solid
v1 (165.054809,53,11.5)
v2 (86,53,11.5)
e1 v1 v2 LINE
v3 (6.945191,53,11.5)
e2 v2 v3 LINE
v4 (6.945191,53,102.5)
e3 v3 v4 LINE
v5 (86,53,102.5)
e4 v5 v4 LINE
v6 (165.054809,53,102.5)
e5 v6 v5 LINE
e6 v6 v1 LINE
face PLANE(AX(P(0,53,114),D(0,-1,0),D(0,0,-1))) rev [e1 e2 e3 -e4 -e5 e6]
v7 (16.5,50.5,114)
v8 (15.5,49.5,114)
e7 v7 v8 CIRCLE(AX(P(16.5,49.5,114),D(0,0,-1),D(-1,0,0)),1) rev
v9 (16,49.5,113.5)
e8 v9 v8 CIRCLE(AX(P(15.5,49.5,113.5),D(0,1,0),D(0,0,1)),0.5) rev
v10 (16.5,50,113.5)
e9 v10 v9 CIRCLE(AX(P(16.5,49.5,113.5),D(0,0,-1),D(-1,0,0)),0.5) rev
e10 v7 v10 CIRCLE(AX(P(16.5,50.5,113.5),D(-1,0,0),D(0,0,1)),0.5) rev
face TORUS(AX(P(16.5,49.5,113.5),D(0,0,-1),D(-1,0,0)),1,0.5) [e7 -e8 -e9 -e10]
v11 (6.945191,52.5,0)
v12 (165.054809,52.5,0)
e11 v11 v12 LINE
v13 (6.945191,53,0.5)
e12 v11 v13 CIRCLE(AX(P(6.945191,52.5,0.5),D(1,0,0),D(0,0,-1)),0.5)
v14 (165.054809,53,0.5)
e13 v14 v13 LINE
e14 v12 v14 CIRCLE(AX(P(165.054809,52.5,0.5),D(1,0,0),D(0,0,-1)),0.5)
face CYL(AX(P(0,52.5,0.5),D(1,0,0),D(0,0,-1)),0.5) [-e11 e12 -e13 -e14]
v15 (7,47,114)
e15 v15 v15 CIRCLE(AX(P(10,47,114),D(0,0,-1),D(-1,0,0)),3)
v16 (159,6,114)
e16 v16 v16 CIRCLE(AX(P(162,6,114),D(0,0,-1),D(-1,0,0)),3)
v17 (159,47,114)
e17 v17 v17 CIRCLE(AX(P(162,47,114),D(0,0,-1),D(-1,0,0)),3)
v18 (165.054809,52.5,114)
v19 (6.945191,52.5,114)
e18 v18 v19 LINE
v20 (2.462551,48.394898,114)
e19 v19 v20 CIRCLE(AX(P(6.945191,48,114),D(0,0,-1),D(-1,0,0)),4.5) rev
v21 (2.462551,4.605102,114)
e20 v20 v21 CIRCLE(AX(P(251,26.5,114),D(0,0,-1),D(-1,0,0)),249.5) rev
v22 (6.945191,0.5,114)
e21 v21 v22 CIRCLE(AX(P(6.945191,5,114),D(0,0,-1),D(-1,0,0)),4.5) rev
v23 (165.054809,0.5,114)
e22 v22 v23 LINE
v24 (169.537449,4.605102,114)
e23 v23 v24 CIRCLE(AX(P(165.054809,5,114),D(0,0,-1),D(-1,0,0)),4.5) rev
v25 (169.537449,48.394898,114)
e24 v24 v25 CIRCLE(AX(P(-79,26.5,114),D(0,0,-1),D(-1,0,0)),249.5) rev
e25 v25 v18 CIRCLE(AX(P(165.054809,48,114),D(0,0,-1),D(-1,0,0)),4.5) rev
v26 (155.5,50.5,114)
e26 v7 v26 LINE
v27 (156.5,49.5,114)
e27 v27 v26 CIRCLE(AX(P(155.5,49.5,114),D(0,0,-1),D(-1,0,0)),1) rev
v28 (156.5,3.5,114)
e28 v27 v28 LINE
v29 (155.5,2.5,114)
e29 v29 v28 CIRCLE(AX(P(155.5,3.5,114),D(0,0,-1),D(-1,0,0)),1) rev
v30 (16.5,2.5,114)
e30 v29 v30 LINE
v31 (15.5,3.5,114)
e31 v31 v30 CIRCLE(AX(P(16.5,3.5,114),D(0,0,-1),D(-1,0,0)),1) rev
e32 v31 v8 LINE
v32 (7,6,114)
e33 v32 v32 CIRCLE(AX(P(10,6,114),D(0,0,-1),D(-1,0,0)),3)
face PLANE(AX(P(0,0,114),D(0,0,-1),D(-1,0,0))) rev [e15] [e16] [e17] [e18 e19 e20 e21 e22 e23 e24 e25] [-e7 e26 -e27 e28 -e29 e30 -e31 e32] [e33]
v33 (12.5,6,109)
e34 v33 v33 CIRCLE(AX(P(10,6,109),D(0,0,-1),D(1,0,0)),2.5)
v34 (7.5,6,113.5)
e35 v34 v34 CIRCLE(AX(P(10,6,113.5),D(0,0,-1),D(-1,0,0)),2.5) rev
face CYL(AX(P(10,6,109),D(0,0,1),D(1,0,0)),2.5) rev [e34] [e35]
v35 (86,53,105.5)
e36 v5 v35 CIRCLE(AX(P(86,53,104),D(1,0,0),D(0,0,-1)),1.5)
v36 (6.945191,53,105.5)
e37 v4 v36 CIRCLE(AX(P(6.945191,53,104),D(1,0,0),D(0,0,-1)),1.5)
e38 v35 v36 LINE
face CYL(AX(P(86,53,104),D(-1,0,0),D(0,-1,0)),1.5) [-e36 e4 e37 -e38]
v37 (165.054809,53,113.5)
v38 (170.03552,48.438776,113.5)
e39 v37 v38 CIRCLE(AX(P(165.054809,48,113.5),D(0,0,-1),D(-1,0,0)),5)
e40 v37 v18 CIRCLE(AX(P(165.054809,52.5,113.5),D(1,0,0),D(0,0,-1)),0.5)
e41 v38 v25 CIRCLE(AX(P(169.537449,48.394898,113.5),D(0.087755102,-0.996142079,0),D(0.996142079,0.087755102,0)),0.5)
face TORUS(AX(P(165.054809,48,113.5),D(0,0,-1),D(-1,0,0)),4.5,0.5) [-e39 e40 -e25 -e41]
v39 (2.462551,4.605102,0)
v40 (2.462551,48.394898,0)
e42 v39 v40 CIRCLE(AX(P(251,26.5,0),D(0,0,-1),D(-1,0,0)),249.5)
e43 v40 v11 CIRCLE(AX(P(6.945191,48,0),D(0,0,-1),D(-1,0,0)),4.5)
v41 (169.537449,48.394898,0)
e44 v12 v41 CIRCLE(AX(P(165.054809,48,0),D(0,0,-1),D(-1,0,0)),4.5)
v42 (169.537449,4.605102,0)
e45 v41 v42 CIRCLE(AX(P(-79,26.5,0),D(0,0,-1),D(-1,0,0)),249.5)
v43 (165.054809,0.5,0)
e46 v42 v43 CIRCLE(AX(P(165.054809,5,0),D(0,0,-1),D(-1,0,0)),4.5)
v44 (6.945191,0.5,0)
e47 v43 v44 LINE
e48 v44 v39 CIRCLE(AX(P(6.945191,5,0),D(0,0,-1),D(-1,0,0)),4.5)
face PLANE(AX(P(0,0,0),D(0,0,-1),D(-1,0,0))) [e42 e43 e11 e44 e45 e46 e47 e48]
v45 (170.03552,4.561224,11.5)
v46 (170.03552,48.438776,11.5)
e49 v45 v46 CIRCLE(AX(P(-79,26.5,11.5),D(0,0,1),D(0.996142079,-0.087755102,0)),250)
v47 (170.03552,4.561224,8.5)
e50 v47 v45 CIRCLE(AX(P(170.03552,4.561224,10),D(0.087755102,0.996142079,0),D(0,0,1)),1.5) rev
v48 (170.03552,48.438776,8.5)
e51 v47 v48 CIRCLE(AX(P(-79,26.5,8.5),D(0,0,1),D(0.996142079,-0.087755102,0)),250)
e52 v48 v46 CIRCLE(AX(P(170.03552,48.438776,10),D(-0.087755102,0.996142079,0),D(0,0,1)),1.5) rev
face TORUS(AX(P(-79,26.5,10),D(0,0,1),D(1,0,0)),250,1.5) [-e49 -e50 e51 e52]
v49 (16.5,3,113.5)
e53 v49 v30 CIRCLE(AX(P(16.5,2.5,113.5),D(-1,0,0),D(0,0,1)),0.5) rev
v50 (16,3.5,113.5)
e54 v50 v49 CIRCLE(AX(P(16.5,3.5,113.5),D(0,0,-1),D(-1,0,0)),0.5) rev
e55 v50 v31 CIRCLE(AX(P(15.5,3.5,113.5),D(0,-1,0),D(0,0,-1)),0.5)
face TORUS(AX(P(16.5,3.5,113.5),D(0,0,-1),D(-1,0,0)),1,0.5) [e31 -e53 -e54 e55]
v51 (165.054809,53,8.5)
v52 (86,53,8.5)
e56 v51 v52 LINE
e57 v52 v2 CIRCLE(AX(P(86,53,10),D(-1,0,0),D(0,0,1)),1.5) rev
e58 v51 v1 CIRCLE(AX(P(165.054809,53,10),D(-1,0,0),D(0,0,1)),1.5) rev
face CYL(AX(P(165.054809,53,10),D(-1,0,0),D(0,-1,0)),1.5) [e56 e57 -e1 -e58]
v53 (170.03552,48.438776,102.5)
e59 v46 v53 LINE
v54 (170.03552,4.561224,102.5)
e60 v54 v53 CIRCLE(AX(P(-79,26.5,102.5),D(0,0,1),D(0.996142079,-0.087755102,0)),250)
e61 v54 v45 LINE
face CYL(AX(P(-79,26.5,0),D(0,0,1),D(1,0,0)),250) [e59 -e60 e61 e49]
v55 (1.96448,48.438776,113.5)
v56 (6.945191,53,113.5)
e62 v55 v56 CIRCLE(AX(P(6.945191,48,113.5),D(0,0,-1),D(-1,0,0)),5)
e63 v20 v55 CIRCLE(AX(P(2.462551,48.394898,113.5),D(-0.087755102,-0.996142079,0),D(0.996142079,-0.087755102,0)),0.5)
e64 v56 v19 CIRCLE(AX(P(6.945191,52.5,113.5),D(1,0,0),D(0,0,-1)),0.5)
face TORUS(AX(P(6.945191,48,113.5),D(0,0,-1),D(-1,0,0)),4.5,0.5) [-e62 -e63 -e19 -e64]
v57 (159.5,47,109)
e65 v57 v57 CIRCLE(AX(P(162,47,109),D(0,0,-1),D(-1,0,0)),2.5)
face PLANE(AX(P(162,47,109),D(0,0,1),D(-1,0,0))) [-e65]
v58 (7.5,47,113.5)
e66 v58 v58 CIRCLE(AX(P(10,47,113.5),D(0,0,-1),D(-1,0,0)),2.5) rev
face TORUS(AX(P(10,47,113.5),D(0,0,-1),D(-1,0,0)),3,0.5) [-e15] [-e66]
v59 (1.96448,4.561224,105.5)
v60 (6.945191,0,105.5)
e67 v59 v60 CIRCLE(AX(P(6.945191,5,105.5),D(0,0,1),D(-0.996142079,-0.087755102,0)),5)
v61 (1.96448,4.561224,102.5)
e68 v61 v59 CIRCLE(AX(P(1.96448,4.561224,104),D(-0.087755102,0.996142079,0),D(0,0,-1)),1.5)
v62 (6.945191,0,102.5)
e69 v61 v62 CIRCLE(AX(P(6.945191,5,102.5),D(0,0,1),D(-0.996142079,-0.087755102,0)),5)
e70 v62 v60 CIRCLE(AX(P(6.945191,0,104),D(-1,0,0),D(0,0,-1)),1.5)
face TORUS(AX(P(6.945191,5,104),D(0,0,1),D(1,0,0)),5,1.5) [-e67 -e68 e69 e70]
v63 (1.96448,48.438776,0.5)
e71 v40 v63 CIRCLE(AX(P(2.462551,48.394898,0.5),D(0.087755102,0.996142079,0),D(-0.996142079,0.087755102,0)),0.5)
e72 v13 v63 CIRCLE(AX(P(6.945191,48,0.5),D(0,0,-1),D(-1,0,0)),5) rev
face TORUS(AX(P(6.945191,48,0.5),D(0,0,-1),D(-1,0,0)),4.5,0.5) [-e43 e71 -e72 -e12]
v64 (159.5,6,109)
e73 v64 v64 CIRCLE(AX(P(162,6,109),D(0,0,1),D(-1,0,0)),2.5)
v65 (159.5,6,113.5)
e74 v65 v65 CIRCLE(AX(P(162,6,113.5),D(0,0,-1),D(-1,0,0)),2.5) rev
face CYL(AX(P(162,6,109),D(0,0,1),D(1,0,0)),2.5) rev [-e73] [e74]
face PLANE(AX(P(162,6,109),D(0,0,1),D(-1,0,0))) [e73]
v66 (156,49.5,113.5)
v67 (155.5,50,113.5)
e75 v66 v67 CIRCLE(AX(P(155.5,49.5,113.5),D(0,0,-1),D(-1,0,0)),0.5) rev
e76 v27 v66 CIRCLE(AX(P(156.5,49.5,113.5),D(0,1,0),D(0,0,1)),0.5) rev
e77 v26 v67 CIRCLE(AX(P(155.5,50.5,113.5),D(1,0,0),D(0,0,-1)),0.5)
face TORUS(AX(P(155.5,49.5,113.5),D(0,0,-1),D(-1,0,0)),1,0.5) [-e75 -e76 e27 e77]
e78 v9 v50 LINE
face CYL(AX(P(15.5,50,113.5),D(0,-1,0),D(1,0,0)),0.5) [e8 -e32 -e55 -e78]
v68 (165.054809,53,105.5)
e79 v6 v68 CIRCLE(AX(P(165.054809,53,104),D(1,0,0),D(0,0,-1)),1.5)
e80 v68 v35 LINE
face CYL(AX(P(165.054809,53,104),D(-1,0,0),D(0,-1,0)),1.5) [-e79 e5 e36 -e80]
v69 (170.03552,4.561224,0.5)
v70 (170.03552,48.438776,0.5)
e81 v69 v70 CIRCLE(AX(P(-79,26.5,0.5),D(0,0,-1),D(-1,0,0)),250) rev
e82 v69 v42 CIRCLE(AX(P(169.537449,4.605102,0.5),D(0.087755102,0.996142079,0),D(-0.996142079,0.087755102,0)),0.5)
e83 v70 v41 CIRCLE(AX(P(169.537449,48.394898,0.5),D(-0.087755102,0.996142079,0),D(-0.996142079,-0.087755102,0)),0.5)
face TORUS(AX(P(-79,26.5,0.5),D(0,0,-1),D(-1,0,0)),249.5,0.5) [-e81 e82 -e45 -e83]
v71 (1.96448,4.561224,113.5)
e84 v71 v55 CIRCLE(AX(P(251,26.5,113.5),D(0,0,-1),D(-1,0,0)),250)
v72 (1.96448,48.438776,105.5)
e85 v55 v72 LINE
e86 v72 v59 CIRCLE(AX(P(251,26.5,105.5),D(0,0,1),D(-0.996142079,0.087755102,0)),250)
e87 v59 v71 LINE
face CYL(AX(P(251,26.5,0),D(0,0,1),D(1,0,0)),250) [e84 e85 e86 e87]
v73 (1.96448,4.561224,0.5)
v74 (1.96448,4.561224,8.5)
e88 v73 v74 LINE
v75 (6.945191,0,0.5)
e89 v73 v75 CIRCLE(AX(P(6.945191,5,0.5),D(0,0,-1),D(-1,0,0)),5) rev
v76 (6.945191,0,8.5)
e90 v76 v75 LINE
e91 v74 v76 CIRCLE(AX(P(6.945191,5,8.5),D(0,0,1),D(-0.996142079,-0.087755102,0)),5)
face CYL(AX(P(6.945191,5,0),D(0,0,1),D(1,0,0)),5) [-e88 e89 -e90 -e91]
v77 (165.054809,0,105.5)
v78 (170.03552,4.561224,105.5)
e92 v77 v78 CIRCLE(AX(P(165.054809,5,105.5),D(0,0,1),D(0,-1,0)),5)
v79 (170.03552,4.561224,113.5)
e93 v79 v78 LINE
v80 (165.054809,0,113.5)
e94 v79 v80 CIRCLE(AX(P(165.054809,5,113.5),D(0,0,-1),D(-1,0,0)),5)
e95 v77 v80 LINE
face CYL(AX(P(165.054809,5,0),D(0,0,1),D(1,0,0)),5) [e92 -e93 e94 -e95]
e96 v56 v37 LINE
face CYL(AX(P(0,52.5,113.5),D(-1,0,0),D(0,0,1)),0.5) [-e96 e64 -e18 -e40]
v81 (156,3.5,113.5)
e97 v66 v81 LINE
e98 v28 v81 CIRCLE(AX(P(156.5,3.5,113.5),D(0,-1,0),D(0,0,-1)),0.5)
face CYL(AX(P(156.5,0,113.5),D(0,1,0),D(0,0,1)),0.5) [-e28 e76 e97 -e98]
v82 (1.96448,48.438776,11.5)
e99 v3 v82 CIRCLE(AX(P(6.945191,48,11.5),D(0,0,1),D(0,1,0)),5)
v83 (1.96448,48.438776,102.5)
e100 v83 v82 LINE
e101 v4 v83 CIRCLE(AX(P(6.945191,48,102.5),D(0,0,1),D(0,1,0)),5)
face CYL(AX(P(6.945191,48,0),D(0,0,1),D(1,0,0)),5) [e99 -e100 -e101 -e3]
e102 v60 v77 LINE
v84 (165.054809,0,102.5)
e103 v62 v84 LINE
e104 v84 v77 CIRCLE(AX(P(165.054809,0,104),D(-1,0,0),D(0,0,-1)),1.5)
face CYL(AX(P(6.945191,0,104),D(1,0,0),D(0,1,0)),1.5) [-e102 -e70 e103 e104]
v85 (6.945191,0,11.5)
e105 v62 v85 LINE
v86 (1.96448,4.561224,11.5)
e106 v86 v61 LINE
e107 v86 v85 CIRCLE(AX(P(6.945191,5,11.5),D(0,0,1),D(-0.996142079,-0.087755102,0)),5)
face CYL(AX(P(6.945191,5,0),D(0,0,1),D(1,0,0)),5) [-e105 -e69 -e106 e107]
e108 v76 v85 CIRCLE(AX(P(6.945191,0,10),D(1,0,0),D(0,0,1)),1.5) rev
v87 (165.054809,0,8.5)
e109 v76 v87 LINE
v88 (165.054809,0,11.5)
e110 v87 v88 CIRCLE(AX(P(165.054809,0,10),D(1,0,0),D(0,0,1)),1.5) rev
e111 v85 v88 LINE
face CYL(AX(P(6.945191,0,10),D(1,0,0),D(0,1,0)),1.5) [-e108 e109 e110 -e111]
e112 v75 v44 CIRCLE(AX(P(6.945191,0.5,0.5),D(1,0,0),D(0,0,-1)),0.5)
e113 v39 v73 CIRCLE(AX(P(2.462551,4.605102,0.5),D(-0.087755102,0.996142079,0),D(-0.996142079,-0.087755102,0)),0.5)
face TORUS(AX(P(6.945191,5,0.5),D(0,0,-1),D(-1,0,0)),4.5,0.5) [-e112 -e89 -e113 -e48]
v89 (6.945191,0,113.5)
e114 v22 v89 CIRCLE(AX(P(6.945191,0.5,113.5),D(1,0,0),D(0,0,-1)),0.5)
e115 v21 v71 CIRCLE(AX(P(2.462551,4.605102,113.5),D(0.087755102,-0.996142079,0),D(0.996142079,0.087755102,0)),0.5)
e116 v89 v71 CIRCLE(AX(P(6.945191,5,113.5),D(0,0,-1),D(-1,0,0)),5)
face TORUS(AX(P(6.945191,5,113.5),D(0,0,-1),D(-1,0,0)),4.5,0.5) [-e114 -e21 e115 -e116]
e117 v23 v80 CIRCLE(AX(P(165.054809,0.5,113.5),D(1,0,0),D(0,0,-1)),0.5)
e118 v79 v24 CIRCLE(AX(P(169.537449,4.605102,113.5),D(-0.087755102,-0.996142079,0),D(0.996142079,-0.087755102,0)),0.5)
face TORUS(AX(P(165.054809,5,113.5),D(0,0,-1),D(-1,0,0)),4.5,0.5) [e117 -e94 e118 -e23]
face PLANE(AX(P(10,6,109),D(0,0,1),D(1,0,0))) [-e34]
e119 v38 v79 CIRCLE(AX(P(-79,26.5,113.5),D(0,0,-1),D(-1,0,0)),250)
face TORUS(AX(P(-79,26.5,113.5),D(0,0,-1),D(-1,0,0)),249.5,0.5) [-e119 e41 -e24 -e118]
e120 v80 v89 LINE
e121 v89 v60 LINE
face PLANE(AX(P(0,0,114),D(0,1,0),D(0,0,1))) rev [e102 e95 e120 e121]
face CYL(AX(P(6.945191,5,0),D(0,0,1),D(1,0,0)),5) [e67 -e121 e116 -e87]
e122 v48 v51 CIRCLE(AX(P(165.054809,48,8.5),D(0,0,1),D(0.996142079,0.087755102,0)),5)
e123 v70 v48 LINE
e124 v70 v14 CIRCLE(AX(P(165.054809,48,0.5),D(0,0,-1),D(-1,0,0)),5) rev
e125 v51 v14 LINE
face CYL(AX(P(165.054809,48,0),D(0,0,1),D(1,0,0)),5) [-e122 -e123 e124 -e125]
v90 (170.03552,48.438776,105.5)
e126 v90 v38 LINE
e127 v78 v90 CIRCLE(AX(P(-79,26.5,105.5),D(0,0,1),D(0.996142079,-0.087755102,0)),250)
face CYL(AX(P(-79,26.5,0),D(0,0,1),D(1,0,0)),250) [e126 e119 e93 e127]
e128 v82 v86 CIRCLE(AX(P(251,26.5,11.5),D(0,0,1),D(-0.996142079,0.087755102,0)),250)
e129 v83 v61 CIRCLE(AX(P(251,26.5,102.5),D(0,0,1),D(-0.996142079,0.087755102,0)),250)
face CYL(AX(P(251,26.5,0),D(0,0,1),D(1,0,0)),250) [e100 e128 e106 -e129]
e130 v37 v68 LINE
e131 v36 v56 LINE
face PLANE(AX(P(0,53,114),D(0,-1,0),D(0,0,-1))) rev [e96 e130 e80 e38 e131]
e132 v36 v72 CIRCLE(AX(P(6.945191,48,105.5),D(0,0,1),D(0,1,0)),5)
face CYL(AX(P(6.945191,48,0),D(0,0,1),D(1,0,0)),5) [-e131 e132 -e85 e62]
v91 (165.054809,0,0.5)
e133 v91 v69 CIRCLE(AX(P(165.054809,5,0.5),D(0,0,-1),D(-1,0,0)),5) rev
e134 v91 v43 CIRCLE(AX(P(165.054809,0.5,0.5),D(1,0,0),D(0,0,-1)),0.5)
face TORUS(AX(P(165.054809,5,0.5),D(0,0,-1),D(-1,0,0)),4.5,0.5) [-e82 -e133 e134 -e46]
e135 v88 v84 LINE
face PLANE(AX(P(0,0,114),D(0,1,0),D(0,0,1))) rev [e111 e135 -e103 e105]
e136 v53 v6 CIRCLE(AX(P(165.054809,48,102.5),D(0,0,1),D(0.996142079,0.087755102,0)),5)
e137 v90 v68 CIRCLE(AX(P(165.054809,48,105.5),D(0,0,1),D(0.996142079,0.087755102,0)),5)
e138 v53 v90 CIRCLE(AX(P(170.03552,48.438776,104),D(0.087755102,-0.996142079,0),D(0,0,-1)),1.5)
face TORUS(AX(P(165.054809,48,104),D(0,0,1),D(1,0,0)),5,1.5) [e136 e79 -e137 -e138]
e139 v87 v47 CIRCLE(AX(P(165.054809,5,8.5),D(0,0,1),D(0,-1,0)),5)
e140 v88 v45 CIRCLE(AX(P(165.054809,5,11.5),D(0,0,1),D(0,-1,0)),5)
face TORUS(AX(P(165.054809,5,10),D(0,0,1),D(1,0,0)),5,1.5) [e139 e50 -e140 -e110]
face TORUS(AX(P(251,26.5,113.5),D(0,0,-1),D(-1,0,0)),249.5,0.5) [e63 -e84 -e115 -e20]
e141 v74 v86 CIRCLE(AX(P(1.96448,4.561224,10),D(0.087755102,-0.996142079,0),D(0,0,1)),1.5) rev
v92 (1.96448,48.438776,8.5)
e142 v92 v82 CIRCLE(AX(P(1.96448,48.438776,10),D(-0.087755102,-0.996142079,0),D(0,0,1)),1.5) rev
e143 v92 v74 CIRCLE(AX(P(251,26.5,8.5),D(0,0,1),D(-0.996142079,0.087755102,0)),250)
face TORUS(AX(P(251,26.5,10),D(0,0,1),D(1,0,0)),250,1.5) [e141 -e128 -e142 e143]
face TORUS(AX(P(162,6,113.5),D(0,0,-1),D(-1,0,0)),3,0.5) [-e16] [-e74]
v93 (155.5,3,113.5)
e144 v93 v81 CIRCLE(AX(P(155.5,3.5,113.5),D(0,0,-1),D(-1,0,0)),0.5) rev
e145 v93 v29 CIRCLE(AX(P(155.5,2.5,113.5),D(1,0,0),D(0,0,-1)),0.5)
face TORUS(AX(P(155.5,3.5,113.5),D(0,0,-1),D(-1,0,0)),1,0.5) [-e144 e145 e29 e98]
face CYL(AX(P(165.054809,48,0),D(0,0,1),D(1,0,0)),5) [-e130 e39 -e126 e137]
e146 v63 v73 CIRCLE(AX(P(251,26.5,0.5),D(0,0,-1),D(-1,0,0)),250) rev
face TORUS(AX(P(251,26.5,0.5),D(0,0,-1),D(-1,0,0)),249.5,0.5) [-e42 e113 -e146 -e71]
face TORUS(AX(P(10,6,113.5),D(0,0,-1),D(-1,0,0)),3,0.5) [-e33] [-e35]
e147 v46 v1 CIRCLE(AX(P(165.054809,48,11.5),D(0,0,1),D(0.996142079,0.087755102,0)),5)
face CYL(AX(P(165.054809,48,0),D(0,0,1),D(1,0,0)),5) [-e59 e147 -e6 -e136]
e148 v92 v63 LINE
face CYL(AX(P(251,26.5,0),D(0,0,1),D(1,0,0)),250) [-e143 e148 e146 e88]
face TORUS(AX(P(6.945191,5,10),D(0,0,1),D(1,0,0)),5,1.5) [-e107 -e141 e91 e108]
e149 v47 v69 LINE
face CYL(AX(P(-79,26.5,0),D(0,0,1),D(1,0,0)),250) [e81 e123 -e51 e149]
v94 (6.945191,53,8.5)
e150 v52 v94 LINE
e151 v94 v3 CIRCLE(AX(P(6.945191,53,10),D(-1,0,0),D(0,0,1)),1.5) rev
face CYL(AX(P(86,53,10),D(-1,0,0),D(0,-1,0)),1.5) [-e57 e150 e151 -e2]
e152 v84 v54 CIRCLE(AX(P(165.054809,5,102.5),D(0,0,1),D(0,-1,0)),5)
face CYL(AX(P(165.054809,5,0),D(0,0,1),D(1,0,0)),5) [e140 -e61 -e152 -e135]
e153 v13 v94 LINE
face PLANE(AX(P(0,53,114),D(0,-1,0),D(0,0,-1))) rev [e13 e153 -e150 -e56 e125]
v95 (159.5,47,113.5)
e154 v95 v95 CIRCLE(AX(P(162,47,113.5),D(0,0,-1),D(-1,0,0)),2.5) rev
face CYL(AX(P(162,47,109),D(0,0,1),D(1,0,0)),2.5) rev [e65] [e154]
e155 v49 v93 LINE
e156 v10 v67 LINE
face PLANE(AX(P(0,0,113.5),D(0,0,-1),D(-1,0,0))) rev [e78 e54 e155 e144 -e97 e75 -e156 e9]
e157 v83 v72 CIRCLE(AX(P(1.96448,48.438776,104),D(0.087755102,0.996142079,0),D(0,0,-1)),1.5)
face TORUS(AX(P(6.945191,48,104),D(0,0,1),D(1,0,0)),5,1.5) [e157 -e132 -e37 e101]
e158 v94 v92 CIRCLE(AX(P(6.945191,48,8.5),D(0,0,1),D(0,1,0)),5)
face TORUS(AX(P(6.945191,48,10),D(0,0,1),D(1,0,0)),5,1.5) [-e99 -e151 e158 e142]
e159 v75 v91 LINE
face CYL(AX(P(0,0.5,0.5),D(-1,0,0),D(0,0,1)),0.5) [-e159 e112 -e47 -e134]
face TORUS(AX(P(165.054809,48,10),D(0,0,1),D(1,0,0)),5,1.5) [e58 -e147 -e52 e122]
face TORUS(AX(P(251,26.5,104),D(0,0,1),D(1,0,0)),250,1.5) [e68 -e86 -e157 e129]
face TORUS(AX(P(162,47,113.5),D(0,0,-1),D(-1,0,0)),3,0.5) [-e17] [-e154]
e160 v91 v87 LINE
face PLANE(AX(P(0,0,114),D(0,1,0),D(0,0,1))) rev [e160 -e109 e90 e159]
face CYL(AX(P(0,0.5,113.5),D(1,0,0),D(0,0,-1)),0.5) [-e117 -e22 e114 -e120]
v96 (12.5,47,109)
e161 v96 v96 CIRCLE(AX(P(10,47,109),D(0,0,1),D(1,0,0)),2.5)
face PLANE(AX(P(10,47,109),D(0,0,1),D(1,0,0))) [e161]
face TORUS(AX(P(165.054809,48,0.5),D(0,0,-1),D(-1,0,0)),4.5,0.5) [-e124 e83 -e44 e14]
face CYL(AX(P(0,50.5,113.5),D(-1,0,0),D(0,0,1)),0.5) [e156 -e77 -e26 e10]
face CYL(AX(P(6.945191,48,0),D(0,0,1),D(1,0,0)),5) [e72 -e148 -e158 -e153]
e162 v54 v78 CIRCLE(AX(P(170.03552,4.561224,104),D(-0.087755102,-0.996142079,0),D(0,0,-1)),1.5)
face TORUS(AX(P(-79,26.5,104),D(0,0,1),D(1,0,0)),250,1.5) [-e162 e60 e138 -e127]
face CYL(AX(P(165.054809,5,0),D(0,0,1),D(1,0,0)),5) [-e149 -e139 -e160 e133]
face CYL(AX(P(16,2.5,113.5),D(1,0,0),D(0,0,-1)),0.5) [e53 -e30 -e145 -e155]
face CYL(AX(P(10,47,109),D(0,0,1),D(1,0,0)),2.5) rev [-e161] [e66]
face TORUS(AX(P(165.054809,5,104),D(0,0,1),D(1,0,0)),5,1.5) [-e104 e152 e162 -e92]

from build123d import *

# Parameters (mm, degrees)
SKETCH1_W               = 172
SKETCH1_H               = 53
BOSS_EXTRUDE1_DEPTH     = 114
CUT_EXTRUDE1_DEPTH      = 214.046943184
FILLET1_R               = 5
SKETCH5_W               = 140
SKETCH5_H               = 47
CUT_EXTRUDE2_DEPTH      = 0.5
FILLET2_R               = 0.5
FILLET3_R               = 0.5
SKETCH6_R               = 2.5
CUT_EXTRUDE3_DEPTH      = 5
MIRROR4_COPY_1_SKETCH_R = 2.5
MIRROR4_COPY_1_DEPTH    = 5
FILLET4_R               = 0.5


with BuildPart() as part:
    # Sketch1 → Boss-Extrude1 (new body)
    with BuildSketch(Plane.XY):
        with Locations((86, 26.5)):
            Rectangle(SKETCH1_W, SKETCH1_H)
    extrude(amount=BOSS_EXTRUDE1_DEPTH)

    # Sketch2 → Cut-Extrude1 (cut, through all)
    with BuildSketch(Plane.XY.offset(114)):
        with BuildLine():
            Line((-106.133621178, 125.317996668), (21.358968095, 125.317996668))
            ThreePointArc((21.358968095, 125.317996668), (1.386909526, 40.403419141), (11.805219162, -46.203898243))
            Line((11.805219162, -46.203898243), (-106.133621178, -46.203898243))
            Line((-106.133621178, -46.203898243), (-106.133621178, 125.317996668))
        make_face()
    cut_extrude1 = extrude(amount=-CUT_EXTRUDE1_DEPTH, mode=Mode.SUBTRACT)

    # Mirror1: Cut-Extrude1 across plane
    add(cut_extrude1.mirror(Plane(origin=(86, 0, 0), x_dir=(0, 0, 1), z_dir=(1, 0, 0))), mode=Mode.SUBTRACT)

    # Fillet1
    fillet1_edges = [part.edges().sort_by_distance(p)[0] for p in [
        (2.408467562, 0, 57),
        (2.408467562, 53, 57),
        (169.591532438, 53, 57),
        (169.591532438, 0, 57),
    ]]
    fillet(fillet1_edges, radius=FILLET1_R)

    # Sweep1: sweep along a path in Sketch3
    with BuildLine(Plane.XY.offset(104)) as sweep1_path:
        Line((6.945190582, 0), (165.054809418, 0))
        ThreePointArc((165.054809418, 0), (168.431651319, 1.312597286), (170.035519814, 4.56122449))
        ThreePointArc((170.035519814, 4.56122449), (171, 26.5), (170.035519814, 48.43877551))
        ThreePointArc((170.035519814, 48.43877551), (168.431651319, 51.687402714), (165.054809418, 53))
        Line((165.054809418, 53), (6.945190582, 53))
        ThreePointArc((6.945190582, 53), (3.568348681, 51.687402714), (1.964480186, 48.43877551))
        ThreePointArc((1.964480186, 48.43877551), (1, 26.5), (1.964480186, 4.56122449))
        ThreePointArc((1.964480186, 4.56122449), (3.568348681, 1.312597286), (6.945190582, 0))
    # Sketch4 → Sweep1 (sweep)
    with BuildSketch(Plane(origin=(86, 0, 0), x_dir=(0, 0, -1), z_dir=(1, 0, 0))):
        with BuildLine():
            Line((-102.5, 53), (-105.5, 53))
            ThreePointArc((-105.5, 53), (-104, 54.5), (-102.5, 53))
        make_face()
    sweep1 = sweep(path=sweep1_path.line)

    # Mirror2: Sweep1 across plane
    add(sweep1.mirror(Plane.XY.offset(57)))

    # Sketch5 → Cut-Extrude2 (cut)
    with BuildSketch(Plane.XY.offset(114)):
        with Locations((86, 26.5)):
            Rectangle(SKETCH5_W, SKETCH5_H)
    extrude(amount=-CUT_EXTRUDE2_DEPTH, mode=Mode.SUBTRACT)

    # Fillet2
    fillet2_edges = [part.edges().sort_by_distance(p)[0] for p in [
        (86, 50, 114),
        (16, 50, 113.75),
        (156, 26.5, 114),
        (156, 50, 113.75),
        (156, 3, 113.75),
        (16, 3, 113.75),
        (16, 26.5, 114),
        (86, 3, 114),
    ]]
    fillet(fillet2_edges, radius=FILLET2_R - 0.0001)  # a hair under: the kernel refuses the full size

    # Fillet3
    fillet3_edges = [part.edges().sort_by_distance(p)[0] for p in [
        (86, 0, 114),
        (86, 0, 0),
        (86, 53, 0),
        (171, 26.5, 0),
        (1, 26.5, 0),
        (3.568348681, 51.687402714, 0),
        (168.431651319, 51.687402714, 0),
        (168.431651319, 1.312597286, 0),
        (3.568348681, 1.312597286, 0),
        (1, 26.5, 114),
        (171, 26.5, 114),
        (86, 53, 114),
        (3.568348681, 51.687402714, 114),
        (168.431651319, 51.687402714, 114),
        (168.431651319, 1.312597286, 114),
        (3.568348681, 1.312597286, 114),
    ]]
    fillet(fillet3_edges, radius=FILLET3_R)

    # Sketch6 → Cut-Extrude3 (cut)
    with BuildSketch(Plane.XY.offset(114)):
        with Locations((10, 47)):
            Circle(SKETCH6_R)
    cut_extrude3 = extrude(amount=-CUT_EXTRUDE3_DEPTH, mode=Mode.SUBTRACT)

    # Mirror3: Cut-Extrude3 across plane
    add(cut_extrude3.mirror(Plane(origin=(86, 0, 0), x_dir=(0, 0, 1), z_dir=(1, 0, 0))), mode=Mode.SUBTRACT)

    # Mirror4: Cut-Extrude3 across plane
    add(cut_extrude3.mirror(Plane.ZX.offset(26.5)), mode=Mode.SUBTRACT)

    # Mirror4 copy 1 sketch → Mirror4 copy 1 (cut)
    with BuildSketch(Plane(origin=(172, 53, 114), x_dir=(-1, 0, 0), z_dir=(0, 0, 1))):
        with Locations((10, 47)):
            Circle(MIRROR4_COPY_1_SKETCH_R)
    extrude(amount=-MIRROR4_COPY_1_DEPTH, mode=Mode.SUBTRACT)

    # Fillet4
    fillet4_edges = [part.edges().sort_by_distance(p)[0] for p in [
        (7.5, 47, 114),
        (164.5, 47, 114),
        (7.5, 6, 114),
        (164.5, 6, 114),
    ]]
    fillet(fillet4_edges, radius=FILLET4_R)


solid = part.part
